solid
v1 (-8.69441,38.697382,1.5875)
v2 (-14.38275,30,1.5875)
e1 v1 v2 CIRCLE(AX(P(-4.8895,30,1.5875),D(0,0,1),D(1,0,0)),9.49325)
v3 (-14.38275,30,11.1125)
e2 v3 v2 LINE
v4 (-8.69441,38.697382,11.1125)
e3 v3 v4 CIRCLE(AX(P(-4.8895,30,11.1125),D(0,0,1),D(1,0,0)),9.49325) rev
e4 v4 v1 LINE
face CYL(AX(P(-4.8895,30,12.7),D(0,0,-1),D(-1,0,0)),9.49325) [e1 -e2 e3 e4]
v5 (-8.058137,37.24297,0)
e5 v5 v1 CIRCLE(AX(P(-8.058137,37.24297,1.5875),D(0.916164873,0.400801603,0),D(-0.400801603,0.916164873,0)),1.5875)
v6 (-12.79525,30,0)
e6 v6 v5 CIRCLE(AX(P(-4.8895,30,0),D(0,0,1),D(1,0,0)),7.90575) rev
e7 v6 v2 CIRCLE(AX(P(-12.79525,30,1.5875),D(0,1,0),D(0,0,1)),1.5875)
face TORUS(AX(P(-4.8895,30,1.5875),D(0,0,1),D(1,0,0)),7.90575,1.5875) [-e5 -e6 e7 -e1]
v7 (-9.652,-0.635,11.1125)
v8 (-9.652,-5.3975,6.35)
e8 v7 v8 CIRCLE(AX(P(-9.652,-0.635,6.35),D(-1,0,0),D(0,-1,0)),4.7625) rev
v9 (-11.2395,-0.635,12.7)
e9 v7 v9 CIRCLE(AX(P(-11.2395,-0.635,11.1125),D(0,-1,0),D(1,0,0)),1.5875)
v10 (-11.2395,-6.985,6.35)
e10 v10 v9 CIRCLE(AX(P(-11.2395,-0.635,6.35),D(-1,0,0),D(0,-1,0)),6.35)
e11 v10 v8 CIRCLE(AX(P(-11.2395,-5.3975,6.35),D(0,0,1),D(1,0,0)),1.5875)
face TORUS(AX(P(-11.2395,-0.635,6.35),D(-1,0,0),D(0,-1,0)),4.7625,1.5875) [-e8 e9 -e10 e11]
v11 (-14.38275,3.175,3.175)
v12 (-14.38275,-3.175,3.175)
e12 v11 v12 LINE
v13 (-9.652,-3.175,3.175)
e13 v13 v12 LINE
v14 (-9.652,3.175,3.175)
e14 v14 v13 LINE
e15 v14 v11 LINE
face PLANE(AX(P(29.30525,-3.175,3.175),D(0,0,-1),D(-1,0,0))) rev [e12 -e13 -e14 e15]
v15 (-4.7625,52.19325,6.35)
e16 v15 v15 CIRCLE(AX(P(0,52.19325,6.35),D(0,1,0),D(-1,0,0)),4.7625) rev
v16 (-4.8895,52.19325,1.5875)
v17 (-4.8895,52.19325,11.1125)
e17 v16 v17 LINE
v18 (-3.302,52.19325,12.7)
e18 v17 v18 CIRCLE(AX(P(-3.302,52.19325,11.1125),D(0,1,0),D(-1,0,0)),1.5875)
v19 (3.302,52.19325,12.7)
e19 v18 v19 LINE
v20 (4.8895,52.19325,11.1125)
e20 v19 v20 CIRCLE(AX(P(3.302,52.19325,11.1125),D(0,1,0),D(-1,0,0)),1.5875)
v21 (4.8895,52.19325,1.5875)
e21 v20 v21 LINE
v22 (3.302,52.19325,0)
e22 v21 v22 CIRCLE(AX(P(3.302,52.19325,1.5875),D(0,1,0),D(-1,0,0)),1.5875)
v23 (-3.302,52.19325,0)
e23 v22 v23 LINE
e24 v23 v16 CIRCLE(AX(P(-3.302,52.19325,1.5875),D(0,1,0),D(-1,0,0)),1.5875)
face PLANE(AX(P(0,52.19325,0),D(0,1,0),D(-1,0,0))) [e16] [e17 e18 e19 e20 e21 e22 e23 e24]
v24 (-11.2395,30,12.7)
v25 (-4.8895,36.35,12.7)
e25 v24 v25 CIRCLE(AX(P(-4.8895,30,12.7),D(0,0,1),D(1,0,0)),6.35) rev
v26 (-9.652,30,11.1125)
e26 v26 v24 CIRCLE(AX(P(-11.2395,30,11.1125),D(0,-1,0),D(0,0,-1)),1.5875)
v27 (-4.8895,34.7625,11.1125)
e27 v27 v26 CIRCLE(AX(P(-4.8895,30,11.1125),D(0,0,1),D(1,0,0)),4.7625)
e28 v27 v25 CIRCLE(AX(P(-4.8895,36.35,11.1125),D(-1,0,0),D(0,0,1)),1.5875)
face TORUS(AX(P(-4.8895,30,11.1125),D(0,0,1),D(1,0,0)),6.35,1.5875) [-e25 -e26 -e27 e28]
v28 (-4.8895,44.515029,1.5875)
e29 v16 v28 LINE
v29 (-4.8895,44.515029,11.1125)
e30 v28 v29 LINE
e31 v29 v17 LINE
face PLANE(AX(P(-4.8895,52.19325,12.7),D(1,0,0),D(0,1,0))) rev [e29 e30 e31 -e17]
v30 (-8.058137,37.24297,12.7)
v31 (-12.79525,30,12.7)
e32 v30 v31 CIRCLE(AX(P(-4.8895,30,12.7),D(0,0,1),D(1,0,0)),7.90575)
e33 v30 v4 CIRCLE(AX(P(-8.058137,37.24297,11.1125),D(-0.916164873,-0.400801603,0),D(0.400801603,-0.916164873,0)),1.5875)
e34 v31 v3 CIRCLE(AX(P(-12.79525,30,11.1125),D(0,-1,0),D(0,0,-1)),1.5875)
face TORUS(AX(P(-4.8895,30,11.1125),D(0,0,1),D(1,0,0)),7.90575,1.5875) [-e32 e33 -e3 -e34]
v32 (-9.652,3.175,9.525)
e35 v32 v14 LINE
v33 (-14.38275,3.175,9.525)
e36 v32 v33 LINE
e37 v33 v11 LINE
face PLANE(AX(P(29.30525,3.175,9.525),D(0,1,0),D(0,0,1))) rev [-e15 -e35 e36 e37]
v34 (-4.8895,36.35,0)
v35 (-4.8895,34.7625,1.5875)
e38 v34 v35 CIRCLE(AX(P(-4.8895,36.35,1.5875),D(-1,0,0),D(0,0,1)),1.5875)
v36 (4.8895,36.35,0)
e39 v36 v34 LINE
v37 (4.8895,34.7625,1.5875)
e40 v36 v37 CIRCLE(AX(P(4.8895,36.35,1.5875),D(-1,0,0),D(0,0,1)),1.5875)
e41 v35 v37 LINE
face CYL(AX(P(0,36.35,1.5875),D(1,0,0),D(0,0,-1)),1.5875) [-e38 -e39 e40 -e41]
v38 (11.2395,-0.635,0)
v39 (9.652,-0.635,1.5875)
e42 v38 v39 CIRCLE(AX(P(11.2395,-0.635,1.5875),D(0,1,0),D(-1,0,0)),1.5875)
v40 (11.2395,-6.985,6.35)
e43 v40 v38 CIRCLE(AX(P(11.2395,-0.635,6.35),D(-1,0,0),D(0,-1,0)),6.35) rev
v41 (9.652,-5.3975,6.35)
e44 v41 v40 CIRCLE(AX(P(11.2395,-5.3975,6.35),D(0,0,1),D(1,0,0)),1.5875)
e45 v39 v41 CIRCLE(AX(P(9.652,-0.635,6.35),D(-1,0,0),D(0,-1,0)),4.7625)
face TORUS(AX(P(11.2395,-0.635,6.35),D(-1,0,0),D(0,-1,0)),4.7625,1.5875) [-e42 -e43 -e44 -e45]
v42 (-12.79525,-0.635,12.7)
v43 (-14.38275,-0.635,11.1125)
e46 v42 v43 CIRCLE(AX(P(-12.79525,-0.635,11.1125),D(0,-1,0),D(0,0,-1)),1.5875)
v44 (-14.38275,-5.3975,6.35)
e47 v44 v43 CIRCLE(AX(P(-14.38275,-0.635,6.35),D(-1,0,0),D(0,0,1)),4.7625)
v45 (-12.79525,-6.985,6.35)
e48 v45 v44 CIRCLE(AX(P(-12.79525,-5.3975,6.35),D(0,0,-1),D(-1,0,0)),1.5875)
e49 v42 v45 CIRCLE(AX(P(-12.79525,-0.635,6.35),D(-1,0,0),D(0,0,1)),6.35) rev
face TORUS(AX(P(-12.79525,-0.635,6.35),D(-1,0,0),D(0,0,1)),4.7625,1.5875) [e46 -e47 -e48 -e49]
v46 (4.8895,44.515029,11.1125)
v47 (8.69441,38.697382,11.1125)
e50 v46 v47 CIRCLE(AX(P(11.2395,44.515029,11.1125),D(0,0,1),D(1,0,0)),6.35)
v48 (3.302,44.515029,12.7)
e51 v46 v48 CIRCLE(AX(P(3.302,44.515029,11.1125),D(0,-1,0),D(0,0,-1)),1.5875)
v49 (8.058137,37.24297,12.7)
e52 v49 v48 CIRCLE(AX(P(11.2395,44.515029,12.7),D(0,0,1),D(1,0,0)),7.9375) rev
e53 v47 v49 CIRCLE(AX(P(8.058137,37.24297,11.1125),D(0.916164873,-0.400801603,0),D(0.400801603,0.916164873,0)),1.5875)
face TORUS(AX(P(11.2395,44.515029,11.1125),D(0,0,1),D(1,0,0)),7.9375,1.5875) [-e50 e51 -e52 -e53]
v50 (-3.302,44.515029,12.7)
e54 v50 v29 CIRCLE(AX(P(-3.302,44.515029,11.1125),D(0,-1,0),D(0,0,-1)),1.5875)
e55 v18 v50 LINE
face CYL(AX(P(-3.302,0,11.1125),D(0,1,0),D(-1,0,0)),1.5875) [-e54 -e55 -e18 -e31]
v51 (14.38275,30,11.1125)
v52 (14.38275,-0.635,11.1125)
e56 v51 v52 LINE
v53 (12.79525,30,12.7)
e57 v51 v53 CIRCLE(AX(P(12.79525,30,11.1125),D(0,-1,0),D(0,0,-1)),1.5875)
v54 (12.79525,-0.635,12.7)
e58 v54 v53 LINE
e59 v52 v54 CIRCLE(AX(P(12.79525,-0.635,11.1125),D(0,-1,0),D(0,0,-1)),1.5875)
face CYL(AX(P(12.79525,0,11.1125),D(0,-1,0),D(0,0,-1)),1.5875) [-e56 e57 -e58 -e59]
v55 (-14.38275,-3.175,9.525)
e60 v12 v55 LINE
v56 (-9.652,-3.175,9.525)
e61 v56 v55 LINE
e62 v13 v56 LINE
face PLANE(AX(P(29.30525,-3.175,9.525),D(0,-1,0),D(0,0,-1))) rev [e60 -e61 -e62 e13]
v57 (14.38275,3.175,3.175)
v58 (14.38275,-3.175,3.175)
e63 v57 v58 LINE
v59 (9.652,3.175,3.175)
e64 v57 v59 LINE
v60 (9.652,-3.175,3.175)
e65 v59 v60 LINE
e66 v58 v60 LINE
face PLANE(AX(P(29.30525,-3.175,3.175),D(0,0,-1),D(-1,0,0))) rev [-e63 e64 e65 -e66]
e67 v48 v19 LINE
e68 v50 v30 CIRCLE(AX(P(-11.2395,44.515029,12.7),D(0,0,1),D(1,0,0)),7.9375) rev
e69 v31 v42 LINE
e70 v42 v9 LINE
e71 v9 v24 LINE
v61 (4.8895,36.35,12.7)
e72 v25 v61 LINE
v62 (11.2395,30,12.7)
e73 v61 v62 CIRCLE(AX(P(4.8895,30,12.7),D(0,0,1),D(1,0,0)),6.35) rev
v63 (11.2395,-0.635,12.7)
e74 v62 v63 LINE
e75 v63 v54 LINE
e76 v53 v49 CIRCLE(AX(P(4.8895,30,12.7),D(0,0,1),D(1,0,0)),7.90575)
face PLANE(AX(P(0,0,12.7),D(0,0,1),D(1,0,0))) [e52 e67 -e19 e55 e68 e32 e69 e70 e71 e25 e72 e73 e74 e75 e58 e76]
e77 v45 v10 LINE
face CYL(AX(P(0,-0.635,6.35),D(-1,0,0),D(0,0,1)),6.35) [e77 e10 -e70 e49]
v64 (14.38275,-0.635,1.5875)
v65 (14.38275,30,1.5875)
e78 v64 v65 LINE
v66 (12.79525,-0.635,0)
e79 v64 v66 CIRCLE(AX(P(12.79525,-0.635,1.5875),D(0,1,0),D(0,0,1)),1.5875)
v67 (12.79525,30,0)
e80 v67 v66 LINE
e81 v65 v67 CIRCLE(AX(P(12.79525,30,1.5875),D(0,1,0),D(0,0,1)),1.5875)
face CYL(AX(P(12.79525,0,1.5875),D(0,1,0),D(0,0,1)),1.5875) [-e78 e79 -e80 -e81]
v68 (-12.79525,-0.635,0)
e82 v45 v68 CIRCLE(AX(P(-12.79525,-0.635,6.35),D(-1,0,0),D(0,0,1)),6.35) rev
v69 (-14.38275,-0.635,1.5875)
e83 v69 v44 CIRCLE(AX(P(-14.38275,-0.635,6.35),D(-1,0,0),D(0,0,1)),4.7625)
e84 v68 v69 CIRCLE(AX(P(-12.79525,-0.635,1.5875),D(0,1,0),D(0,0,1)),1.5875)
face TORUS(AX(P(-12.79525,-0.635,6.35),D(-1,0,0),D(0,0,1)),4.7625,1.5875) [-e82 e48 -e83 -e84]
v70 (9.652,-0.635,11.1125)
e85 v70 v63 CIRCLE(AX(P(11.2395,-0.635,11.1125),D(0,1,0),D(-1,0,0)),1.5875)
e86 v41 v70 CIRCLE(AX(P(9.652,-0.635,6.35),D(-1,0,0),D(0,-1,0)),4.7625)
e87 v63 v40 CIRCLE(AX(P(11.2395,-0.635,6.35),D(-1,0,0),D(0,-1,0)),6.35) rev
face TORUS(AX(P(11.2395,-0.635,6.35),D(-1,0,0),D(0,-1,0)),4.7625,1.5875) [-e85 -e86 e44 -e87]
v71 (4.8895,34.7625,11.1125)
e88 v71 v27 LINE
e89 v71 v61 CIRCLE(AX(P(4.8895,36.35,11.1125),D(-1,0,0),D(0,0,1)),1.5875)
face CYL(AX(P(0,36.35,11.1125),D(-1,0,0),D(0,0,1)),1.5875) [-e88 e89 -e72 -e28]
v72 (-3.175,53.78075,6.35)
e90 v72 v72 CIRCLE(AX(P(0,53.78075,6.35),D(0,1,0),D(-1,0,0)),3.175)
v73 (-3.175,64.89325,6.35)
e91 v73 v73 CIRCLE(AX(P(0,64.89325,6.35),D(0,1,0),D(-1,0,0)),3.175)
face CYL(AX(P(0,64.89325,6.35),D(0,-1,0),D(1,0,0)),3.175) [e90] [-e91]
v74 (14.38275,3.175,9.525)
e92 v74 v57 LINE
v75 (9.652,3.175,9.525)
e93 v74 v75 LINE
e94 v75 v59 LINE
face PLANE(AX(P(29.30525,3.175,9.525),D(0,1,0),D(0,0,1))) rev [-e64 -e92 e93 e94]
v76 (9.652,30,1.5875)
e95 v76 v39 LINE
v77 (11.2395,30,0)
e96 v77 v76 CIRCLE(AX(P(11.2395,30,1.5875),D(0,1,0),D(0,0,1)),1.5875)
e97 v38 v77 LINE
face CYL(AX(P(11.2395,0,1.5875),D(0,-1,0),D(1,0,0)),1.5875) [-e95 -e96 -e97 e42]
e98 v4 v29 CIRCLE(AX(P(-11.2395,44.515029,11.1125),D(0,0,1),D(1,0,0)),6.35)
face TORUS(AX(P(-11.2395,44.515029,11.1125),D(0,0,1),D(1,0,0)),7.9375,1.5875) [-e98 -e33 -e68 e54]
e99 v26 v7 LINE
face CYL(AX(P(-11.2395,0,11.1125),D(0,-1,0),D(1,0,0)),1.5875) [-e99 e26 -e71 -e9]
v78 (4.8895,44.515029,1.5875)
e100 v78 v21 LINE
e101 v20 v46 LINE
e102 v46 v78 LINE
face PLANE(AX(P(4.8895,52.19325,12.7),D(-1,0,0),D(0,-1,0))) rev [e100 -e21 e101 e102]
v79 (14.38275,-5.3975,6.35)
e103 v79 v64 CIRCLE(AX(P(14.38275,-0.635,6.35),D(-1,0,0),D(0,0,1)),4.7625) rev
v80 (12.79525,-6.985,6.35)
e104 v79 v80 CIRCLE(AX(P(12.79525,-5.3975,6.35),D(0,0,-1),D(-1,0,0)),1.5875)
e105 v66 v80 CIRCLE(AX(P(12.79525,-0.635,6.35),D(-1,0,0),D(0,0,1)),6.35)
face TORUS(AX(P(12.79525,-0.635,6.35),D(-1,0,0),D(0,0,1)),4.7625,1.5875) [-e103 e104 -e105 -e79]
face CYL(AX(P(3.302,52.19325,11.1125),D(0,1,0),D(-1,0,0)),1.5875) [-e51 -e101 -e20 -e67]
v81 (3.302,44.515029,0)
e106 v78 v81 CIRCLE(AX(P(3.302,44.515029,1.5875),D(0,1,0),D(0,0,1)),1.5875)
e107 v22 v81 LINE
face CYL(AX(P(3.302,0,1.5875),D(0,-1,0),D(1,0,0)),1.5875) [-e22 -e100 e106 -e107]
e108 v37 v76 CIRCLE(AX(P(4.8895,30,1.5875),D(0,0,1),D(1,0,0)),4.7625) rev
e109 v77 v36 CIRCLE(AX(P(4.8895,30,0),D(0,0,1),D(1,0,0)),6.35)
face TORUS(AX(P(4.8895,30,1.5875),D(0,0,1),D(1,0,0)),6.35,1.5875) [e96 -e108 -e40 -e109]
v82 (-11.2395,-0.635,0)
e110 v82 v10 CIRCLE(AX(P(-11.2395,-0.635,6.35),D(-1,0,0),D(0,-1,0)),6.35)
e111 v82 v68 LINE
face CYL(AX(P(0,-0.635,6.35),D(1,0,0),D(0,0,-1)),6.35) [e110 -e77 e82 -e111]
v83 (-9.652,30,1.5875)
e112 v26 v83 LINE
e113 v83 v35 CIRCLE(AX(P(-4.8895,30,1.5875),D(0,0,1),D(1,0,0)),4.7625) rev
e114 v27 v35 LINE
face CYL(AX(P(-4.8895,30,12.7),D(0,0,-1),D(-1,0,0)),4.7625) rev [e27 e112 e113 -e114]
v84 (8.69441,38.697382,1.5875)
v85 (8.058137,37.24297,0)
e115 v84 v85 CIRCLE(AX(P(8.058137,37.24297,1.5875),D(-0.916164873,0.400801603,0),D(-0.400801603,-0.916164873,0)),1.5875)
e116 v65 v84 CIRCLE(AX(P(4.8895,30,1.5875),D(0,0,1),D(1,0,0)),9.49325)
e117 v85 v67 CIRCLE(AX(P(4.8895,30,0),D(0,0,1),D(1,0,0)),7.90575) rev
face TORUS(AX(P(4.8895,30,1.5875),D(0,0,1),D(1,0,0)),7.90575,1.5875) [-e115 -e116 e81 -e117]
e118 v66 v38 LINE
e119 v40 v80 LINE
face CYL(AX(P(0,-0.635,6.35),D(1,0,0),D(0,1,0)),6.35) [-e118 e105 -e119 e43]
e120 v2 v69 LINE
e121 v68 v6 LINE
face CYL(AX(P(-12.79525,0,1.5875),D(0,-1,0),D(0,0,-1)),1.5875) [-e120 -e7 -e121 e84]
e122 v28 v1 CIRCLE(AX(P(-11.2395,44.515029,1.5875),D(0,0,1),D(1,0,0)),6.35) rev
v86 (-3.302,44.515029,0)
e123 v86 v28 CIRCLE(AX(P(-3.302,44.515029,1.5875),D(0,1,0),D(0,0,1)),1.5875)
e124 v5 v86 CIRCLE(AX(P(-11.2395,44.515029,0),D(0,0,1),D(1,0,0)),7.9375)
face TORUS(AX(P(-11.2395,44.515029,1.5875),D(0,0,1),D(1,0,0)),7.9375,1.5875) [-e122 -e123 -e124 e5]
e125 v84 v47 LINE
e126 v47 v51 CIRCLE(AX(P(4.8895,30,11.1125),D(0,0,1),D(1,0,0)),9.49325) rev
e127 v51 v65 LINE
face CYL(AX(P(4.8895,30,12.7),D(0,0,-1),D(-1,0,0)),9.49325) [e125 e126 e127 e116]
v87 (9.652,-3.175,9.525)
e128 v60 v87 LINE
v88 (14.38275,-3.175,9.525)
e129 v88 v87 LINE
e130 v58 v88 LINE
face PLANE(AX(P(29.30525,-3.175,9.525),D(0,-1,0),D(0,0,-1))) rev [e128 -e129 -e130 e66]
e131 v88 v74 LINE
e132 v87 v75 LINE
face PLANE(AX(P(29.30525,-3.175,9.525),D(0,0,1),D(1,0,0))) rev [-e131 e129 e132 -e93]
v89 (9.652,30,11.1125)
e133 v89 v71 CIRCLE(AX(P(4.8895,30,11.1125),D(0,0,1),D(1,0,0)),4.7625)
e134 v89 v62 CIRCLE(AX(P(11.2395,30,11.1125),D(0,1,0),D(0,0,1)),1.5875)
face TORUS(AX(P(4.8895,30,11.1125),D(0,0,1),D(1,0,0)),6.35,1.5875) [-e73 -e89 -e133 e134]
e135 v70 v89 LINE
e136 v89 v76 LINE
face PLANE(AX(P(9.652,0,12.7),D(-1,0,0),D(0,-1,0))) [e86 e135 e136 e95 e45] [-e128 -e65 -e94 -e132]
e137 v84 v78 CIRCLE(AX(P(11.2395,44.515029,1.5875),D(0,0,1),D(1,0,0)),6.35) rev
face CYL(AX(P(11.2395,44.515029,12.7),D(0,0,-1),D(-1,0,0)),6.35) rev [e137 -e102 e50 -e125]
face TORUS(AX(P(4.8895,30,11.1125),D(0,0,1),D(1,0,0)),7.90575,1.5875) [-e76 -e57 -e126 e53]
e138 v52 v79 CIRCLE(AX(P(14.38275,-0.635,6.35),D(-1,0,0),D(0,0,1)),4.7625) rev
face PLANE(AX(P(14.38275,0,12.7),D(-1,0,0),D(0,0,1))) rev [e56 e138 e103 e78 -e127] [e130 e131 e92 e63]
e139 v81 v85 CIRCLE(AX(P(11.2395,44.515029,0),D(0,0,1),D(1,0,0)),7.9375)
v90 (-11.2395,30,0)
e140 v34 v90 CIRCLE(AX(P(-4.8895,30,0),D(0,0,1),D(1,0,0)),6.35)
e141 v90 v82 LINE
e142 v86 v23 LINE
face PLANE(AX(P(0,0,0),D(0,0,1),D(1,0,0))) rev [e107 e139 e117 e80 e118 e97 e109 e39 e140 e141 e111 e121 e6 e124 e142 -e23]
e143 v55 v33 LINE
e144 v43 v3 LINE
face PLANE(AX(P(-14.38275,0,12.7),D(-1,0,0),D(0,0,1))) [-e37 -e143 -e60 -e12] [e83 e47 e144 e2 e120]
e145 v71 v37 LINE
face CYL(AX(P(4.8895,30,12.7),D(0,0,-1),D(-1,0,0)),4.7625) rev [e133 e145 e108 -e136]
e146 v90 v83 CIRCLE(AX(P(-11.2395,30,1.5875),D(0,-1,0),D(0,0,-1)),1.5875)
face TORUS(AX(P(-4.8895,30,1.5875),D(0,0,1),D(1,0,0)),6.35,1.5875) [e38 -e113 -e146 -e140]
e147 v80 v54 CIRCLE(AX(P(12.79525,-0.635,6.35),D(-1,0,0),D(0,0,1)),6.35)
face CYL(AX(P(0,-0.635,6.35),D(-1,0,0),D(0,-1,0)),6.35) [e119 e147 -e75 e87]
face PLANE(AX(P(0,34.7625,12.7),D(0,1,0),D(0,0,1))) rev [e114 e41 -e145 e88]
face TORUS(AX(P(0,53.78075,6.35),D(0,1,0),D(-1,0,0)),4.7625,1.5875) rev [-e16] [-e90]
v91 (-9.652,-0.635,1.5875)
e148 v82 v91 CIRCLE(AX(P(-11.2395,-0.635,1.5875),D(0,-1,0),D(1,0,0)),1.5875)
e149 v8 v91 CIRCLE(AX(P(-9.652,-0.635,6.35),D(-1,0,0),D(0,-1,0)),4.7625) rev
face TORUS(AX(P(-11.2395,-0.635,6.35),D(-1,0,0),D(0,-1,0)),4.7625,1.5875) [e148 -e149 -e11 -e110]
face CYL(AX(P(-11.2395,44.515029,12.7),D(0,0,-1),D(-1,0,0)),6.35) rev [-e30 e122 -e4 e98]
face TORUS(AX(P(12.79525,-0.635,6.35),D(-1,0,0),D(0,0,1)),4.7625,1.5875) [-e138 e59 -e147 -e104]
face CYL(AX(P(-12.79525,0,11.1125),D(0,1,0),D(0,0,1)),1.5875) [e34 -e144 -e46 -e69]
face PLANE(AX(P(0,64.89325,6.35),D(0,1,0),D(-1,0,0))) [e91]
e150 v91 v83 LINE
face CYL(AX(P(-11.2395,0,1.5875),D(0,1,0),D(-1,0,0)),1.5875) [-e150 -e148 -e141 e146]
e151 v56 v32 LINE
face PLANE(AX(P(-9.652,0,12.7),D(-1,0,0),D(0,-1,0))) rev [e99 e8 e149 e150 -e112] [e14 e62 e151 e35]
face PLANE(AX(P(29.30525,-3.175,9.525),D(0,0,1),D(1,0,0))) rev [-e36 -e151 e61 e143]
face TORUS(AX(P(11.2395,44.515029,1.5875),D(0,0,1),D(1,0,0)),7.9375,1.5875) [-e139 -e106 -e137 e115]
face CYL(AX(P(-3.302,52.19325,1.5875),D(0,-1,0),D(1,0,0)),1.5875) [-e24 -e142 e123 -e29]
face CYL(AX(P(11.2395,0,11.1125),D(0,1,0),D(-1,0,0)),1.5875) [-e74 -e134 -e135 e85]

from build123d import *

# Parameters (mm, degrees)
BOSS_EXTRUDE1_DEPTH = 12.7
SKETCH2_W           = 9.779
SKETCH2_H           = 12.7
BOSS_EXTRUDE2_DEPTH = 12.7
FILLET1_R           = 6.35
SKETCH3_R           = 3.175
BOSS_EXTRUDE3_DEPTH = 12.7
SKETCH4_W           = 6.35
SKETCH4_H           = 6.35
CUT_EXTRUDE1_DEPTH  = 43.688
FILLET2_R           = 6.35
FILLET5_R           = 1.5875
FILLET7_R           = 1.5875


with BuildPart() as part:
    # Sketch1 → Boss-Extrude1 (new body)
    with BuildSketch(Plane.XY):
        with BuildLine():
            Line((9.652, 30), (9.652, -6.985))
            Line((9.652, -6.985), (14.38275, -6.985))
            Line((14.38275, -6.985), (14.38275, 30))
            ThreePointArc((14.38275, 30), (11.60224145, 36.71274145), (4.8895, 39.49325))
            Line((4.8895, 39.49325), (-4.8895, 39.49325))
            ThreePointArc((-4.8895, 39.49325), (-11.60224145, 36.71274145), (-14.38275, 30))
            Line((-14.38275, 30), (-14.38275, -6.985))
            Line((-14.38275, -6.985), (-9.652, -6.985))
            Line((-9.652, -6.985), (-9.652, 30))
            ThreePointArc((-9.652, 30), (-8.257096045, 33.367596045), (-4.8895, 34.7625))
            Line((-4.8895, 34.7625), (4.8895, 34.7625))
            ThreePointArc((4.8895, 34.7625), (8.257096045, 33.367596045), (9.652, 30))
        make_face()
    extrude(amount=BOSS_EXTRUDE1_DEPTH)

    # Sketch2 → Boss-Extrude2 (add)
    with BuildSketch(Plane(origin=(0, 39.49325, 0), x_dir=(1, 0, 0), z_dir=(0, 1, 0))):
        with Locations((0, -6.35)):
            Rectangle(SKETCH2_W, SKETCH2_H)
    extrude(amount=BOSS_EXTRUDE2_DEPTH)

    # Fillet1
    fillet1_edges = [part.edges().sort_by_distance(p)[0] for p in [
        (4.8895, 39.49325, 6.35),
        (-4.8895, 39.49325, 6.35),
    ]]
    fillet(fillet1_edges, radius=FILLET1_R)

    # Sketch3 → Boss-Extrude3 (add)
    with BuildSketch(Plane(origin=(0, 52.19325, 0), x_dir=(1, 0, 0), z_dir=(0, 1, 0))):
        with Locations(Location((0, -6.35, 0), (0, 0, 180))):
            Circle(SKETCH3_R)
    extrude(amount=BOSS_EXTRUDE3_DEPTH)

    # Sketch4 → Cut-Extrude1 (cut)
    with BuildSketch(Plane.ZY.offset(14.38275)):
        with Locations((6.35, 0)):
            Rectangle(SKETCH4_W, SKETCH4_H)
    extrude(amount=-CUT_EXTRUDE1_DEPTH, mode=Mode.SUBTRACT)

    # Fillet2
    fillet2_edges = [part.edges().sort_by_distance(p)[0] for p in [
        (12.017375, -6.985, 0),
        (12.017375, -6.985, 12.7),
        (-12.017375, -6.985, 0),
        (-12.017375, -6.985, 12.7),
    ]]
    fillet(fillet2_edges, radius=FILLET2_R - 0.0001)  # a hair under: the kernel refuses the full size

    # Fillet5
    fillet5_edges = [part.edges().sort_by_distance(p)[0] for p in [
        (-14.38275, 14.68245, 12.7),
        (-9.652, 14.68245, 12.7),
        (9.652, 14.68245, 12.7),
        (14.38275, 14.68245, 12.7),
        (14.38275, 14.68245, 0),
        (14.38275, -5.12515735, 1.85984265),
        (14.38275, -5.12515735, 10.84015735),
        (9.652, 14.68245, 0),
        (9.652, -5.12515735, 1.85984265),
        (9.652, -5.12515735, 10.84015735),
        (-9.652, 14.68245, 0),
        (-14.38275, 14.68245, 0),
        (-9.652, -5.12515735, 1.85984265),
        (-9.652, -5.12515735, 10.84015735),
        (-14.38275, -5.12515735, 1.85984265),
        (-14.38275, -5.12515735, 10.84015735),
        (12.83439634, 35.196192617, 0),
        (8.257096045, 33.367596045, 0),
        (0, 34.7625, 0),
        (-8.257096045, 33.367596045, 0),
        (-8.257096045, 33.367596045, 12.7),
        (0, 34.7625, 12.7),
        (-4.8895, 48.354139564, 0),
        (-4.8895, 48.354139564, 12.7),
        (4.8895, 48.354139564, 12.7),
        (4.8895, 48.354139564, 0),
        (8.257096045, 33.367596045, 12.7),
        (-12.83439634, 35.196192617, 0),
        (-12.83439634, 35.196192617, 12.7),
        (-5.925188067, 41.039315002, 0),
        (-5.925188067, 41.039315002, 12.7),
        (5.925188067, 41.039315002, 0),
        (5.925188067, 41.039315002, 12.7),
        (12.83439634, 35.196192617, 12.7),
    ]]
    fillet(fillet5_edges, radius=FILLET5_R)

    # Fillet7
    fillet7_edges = [part.edges().sort_by_distance(p)[0] for p in [
        (3.175, 52.19325, 6.35),
    ]]
    fillet(fillet7_edges, radius=FILLET7_R)


solid = part.part
